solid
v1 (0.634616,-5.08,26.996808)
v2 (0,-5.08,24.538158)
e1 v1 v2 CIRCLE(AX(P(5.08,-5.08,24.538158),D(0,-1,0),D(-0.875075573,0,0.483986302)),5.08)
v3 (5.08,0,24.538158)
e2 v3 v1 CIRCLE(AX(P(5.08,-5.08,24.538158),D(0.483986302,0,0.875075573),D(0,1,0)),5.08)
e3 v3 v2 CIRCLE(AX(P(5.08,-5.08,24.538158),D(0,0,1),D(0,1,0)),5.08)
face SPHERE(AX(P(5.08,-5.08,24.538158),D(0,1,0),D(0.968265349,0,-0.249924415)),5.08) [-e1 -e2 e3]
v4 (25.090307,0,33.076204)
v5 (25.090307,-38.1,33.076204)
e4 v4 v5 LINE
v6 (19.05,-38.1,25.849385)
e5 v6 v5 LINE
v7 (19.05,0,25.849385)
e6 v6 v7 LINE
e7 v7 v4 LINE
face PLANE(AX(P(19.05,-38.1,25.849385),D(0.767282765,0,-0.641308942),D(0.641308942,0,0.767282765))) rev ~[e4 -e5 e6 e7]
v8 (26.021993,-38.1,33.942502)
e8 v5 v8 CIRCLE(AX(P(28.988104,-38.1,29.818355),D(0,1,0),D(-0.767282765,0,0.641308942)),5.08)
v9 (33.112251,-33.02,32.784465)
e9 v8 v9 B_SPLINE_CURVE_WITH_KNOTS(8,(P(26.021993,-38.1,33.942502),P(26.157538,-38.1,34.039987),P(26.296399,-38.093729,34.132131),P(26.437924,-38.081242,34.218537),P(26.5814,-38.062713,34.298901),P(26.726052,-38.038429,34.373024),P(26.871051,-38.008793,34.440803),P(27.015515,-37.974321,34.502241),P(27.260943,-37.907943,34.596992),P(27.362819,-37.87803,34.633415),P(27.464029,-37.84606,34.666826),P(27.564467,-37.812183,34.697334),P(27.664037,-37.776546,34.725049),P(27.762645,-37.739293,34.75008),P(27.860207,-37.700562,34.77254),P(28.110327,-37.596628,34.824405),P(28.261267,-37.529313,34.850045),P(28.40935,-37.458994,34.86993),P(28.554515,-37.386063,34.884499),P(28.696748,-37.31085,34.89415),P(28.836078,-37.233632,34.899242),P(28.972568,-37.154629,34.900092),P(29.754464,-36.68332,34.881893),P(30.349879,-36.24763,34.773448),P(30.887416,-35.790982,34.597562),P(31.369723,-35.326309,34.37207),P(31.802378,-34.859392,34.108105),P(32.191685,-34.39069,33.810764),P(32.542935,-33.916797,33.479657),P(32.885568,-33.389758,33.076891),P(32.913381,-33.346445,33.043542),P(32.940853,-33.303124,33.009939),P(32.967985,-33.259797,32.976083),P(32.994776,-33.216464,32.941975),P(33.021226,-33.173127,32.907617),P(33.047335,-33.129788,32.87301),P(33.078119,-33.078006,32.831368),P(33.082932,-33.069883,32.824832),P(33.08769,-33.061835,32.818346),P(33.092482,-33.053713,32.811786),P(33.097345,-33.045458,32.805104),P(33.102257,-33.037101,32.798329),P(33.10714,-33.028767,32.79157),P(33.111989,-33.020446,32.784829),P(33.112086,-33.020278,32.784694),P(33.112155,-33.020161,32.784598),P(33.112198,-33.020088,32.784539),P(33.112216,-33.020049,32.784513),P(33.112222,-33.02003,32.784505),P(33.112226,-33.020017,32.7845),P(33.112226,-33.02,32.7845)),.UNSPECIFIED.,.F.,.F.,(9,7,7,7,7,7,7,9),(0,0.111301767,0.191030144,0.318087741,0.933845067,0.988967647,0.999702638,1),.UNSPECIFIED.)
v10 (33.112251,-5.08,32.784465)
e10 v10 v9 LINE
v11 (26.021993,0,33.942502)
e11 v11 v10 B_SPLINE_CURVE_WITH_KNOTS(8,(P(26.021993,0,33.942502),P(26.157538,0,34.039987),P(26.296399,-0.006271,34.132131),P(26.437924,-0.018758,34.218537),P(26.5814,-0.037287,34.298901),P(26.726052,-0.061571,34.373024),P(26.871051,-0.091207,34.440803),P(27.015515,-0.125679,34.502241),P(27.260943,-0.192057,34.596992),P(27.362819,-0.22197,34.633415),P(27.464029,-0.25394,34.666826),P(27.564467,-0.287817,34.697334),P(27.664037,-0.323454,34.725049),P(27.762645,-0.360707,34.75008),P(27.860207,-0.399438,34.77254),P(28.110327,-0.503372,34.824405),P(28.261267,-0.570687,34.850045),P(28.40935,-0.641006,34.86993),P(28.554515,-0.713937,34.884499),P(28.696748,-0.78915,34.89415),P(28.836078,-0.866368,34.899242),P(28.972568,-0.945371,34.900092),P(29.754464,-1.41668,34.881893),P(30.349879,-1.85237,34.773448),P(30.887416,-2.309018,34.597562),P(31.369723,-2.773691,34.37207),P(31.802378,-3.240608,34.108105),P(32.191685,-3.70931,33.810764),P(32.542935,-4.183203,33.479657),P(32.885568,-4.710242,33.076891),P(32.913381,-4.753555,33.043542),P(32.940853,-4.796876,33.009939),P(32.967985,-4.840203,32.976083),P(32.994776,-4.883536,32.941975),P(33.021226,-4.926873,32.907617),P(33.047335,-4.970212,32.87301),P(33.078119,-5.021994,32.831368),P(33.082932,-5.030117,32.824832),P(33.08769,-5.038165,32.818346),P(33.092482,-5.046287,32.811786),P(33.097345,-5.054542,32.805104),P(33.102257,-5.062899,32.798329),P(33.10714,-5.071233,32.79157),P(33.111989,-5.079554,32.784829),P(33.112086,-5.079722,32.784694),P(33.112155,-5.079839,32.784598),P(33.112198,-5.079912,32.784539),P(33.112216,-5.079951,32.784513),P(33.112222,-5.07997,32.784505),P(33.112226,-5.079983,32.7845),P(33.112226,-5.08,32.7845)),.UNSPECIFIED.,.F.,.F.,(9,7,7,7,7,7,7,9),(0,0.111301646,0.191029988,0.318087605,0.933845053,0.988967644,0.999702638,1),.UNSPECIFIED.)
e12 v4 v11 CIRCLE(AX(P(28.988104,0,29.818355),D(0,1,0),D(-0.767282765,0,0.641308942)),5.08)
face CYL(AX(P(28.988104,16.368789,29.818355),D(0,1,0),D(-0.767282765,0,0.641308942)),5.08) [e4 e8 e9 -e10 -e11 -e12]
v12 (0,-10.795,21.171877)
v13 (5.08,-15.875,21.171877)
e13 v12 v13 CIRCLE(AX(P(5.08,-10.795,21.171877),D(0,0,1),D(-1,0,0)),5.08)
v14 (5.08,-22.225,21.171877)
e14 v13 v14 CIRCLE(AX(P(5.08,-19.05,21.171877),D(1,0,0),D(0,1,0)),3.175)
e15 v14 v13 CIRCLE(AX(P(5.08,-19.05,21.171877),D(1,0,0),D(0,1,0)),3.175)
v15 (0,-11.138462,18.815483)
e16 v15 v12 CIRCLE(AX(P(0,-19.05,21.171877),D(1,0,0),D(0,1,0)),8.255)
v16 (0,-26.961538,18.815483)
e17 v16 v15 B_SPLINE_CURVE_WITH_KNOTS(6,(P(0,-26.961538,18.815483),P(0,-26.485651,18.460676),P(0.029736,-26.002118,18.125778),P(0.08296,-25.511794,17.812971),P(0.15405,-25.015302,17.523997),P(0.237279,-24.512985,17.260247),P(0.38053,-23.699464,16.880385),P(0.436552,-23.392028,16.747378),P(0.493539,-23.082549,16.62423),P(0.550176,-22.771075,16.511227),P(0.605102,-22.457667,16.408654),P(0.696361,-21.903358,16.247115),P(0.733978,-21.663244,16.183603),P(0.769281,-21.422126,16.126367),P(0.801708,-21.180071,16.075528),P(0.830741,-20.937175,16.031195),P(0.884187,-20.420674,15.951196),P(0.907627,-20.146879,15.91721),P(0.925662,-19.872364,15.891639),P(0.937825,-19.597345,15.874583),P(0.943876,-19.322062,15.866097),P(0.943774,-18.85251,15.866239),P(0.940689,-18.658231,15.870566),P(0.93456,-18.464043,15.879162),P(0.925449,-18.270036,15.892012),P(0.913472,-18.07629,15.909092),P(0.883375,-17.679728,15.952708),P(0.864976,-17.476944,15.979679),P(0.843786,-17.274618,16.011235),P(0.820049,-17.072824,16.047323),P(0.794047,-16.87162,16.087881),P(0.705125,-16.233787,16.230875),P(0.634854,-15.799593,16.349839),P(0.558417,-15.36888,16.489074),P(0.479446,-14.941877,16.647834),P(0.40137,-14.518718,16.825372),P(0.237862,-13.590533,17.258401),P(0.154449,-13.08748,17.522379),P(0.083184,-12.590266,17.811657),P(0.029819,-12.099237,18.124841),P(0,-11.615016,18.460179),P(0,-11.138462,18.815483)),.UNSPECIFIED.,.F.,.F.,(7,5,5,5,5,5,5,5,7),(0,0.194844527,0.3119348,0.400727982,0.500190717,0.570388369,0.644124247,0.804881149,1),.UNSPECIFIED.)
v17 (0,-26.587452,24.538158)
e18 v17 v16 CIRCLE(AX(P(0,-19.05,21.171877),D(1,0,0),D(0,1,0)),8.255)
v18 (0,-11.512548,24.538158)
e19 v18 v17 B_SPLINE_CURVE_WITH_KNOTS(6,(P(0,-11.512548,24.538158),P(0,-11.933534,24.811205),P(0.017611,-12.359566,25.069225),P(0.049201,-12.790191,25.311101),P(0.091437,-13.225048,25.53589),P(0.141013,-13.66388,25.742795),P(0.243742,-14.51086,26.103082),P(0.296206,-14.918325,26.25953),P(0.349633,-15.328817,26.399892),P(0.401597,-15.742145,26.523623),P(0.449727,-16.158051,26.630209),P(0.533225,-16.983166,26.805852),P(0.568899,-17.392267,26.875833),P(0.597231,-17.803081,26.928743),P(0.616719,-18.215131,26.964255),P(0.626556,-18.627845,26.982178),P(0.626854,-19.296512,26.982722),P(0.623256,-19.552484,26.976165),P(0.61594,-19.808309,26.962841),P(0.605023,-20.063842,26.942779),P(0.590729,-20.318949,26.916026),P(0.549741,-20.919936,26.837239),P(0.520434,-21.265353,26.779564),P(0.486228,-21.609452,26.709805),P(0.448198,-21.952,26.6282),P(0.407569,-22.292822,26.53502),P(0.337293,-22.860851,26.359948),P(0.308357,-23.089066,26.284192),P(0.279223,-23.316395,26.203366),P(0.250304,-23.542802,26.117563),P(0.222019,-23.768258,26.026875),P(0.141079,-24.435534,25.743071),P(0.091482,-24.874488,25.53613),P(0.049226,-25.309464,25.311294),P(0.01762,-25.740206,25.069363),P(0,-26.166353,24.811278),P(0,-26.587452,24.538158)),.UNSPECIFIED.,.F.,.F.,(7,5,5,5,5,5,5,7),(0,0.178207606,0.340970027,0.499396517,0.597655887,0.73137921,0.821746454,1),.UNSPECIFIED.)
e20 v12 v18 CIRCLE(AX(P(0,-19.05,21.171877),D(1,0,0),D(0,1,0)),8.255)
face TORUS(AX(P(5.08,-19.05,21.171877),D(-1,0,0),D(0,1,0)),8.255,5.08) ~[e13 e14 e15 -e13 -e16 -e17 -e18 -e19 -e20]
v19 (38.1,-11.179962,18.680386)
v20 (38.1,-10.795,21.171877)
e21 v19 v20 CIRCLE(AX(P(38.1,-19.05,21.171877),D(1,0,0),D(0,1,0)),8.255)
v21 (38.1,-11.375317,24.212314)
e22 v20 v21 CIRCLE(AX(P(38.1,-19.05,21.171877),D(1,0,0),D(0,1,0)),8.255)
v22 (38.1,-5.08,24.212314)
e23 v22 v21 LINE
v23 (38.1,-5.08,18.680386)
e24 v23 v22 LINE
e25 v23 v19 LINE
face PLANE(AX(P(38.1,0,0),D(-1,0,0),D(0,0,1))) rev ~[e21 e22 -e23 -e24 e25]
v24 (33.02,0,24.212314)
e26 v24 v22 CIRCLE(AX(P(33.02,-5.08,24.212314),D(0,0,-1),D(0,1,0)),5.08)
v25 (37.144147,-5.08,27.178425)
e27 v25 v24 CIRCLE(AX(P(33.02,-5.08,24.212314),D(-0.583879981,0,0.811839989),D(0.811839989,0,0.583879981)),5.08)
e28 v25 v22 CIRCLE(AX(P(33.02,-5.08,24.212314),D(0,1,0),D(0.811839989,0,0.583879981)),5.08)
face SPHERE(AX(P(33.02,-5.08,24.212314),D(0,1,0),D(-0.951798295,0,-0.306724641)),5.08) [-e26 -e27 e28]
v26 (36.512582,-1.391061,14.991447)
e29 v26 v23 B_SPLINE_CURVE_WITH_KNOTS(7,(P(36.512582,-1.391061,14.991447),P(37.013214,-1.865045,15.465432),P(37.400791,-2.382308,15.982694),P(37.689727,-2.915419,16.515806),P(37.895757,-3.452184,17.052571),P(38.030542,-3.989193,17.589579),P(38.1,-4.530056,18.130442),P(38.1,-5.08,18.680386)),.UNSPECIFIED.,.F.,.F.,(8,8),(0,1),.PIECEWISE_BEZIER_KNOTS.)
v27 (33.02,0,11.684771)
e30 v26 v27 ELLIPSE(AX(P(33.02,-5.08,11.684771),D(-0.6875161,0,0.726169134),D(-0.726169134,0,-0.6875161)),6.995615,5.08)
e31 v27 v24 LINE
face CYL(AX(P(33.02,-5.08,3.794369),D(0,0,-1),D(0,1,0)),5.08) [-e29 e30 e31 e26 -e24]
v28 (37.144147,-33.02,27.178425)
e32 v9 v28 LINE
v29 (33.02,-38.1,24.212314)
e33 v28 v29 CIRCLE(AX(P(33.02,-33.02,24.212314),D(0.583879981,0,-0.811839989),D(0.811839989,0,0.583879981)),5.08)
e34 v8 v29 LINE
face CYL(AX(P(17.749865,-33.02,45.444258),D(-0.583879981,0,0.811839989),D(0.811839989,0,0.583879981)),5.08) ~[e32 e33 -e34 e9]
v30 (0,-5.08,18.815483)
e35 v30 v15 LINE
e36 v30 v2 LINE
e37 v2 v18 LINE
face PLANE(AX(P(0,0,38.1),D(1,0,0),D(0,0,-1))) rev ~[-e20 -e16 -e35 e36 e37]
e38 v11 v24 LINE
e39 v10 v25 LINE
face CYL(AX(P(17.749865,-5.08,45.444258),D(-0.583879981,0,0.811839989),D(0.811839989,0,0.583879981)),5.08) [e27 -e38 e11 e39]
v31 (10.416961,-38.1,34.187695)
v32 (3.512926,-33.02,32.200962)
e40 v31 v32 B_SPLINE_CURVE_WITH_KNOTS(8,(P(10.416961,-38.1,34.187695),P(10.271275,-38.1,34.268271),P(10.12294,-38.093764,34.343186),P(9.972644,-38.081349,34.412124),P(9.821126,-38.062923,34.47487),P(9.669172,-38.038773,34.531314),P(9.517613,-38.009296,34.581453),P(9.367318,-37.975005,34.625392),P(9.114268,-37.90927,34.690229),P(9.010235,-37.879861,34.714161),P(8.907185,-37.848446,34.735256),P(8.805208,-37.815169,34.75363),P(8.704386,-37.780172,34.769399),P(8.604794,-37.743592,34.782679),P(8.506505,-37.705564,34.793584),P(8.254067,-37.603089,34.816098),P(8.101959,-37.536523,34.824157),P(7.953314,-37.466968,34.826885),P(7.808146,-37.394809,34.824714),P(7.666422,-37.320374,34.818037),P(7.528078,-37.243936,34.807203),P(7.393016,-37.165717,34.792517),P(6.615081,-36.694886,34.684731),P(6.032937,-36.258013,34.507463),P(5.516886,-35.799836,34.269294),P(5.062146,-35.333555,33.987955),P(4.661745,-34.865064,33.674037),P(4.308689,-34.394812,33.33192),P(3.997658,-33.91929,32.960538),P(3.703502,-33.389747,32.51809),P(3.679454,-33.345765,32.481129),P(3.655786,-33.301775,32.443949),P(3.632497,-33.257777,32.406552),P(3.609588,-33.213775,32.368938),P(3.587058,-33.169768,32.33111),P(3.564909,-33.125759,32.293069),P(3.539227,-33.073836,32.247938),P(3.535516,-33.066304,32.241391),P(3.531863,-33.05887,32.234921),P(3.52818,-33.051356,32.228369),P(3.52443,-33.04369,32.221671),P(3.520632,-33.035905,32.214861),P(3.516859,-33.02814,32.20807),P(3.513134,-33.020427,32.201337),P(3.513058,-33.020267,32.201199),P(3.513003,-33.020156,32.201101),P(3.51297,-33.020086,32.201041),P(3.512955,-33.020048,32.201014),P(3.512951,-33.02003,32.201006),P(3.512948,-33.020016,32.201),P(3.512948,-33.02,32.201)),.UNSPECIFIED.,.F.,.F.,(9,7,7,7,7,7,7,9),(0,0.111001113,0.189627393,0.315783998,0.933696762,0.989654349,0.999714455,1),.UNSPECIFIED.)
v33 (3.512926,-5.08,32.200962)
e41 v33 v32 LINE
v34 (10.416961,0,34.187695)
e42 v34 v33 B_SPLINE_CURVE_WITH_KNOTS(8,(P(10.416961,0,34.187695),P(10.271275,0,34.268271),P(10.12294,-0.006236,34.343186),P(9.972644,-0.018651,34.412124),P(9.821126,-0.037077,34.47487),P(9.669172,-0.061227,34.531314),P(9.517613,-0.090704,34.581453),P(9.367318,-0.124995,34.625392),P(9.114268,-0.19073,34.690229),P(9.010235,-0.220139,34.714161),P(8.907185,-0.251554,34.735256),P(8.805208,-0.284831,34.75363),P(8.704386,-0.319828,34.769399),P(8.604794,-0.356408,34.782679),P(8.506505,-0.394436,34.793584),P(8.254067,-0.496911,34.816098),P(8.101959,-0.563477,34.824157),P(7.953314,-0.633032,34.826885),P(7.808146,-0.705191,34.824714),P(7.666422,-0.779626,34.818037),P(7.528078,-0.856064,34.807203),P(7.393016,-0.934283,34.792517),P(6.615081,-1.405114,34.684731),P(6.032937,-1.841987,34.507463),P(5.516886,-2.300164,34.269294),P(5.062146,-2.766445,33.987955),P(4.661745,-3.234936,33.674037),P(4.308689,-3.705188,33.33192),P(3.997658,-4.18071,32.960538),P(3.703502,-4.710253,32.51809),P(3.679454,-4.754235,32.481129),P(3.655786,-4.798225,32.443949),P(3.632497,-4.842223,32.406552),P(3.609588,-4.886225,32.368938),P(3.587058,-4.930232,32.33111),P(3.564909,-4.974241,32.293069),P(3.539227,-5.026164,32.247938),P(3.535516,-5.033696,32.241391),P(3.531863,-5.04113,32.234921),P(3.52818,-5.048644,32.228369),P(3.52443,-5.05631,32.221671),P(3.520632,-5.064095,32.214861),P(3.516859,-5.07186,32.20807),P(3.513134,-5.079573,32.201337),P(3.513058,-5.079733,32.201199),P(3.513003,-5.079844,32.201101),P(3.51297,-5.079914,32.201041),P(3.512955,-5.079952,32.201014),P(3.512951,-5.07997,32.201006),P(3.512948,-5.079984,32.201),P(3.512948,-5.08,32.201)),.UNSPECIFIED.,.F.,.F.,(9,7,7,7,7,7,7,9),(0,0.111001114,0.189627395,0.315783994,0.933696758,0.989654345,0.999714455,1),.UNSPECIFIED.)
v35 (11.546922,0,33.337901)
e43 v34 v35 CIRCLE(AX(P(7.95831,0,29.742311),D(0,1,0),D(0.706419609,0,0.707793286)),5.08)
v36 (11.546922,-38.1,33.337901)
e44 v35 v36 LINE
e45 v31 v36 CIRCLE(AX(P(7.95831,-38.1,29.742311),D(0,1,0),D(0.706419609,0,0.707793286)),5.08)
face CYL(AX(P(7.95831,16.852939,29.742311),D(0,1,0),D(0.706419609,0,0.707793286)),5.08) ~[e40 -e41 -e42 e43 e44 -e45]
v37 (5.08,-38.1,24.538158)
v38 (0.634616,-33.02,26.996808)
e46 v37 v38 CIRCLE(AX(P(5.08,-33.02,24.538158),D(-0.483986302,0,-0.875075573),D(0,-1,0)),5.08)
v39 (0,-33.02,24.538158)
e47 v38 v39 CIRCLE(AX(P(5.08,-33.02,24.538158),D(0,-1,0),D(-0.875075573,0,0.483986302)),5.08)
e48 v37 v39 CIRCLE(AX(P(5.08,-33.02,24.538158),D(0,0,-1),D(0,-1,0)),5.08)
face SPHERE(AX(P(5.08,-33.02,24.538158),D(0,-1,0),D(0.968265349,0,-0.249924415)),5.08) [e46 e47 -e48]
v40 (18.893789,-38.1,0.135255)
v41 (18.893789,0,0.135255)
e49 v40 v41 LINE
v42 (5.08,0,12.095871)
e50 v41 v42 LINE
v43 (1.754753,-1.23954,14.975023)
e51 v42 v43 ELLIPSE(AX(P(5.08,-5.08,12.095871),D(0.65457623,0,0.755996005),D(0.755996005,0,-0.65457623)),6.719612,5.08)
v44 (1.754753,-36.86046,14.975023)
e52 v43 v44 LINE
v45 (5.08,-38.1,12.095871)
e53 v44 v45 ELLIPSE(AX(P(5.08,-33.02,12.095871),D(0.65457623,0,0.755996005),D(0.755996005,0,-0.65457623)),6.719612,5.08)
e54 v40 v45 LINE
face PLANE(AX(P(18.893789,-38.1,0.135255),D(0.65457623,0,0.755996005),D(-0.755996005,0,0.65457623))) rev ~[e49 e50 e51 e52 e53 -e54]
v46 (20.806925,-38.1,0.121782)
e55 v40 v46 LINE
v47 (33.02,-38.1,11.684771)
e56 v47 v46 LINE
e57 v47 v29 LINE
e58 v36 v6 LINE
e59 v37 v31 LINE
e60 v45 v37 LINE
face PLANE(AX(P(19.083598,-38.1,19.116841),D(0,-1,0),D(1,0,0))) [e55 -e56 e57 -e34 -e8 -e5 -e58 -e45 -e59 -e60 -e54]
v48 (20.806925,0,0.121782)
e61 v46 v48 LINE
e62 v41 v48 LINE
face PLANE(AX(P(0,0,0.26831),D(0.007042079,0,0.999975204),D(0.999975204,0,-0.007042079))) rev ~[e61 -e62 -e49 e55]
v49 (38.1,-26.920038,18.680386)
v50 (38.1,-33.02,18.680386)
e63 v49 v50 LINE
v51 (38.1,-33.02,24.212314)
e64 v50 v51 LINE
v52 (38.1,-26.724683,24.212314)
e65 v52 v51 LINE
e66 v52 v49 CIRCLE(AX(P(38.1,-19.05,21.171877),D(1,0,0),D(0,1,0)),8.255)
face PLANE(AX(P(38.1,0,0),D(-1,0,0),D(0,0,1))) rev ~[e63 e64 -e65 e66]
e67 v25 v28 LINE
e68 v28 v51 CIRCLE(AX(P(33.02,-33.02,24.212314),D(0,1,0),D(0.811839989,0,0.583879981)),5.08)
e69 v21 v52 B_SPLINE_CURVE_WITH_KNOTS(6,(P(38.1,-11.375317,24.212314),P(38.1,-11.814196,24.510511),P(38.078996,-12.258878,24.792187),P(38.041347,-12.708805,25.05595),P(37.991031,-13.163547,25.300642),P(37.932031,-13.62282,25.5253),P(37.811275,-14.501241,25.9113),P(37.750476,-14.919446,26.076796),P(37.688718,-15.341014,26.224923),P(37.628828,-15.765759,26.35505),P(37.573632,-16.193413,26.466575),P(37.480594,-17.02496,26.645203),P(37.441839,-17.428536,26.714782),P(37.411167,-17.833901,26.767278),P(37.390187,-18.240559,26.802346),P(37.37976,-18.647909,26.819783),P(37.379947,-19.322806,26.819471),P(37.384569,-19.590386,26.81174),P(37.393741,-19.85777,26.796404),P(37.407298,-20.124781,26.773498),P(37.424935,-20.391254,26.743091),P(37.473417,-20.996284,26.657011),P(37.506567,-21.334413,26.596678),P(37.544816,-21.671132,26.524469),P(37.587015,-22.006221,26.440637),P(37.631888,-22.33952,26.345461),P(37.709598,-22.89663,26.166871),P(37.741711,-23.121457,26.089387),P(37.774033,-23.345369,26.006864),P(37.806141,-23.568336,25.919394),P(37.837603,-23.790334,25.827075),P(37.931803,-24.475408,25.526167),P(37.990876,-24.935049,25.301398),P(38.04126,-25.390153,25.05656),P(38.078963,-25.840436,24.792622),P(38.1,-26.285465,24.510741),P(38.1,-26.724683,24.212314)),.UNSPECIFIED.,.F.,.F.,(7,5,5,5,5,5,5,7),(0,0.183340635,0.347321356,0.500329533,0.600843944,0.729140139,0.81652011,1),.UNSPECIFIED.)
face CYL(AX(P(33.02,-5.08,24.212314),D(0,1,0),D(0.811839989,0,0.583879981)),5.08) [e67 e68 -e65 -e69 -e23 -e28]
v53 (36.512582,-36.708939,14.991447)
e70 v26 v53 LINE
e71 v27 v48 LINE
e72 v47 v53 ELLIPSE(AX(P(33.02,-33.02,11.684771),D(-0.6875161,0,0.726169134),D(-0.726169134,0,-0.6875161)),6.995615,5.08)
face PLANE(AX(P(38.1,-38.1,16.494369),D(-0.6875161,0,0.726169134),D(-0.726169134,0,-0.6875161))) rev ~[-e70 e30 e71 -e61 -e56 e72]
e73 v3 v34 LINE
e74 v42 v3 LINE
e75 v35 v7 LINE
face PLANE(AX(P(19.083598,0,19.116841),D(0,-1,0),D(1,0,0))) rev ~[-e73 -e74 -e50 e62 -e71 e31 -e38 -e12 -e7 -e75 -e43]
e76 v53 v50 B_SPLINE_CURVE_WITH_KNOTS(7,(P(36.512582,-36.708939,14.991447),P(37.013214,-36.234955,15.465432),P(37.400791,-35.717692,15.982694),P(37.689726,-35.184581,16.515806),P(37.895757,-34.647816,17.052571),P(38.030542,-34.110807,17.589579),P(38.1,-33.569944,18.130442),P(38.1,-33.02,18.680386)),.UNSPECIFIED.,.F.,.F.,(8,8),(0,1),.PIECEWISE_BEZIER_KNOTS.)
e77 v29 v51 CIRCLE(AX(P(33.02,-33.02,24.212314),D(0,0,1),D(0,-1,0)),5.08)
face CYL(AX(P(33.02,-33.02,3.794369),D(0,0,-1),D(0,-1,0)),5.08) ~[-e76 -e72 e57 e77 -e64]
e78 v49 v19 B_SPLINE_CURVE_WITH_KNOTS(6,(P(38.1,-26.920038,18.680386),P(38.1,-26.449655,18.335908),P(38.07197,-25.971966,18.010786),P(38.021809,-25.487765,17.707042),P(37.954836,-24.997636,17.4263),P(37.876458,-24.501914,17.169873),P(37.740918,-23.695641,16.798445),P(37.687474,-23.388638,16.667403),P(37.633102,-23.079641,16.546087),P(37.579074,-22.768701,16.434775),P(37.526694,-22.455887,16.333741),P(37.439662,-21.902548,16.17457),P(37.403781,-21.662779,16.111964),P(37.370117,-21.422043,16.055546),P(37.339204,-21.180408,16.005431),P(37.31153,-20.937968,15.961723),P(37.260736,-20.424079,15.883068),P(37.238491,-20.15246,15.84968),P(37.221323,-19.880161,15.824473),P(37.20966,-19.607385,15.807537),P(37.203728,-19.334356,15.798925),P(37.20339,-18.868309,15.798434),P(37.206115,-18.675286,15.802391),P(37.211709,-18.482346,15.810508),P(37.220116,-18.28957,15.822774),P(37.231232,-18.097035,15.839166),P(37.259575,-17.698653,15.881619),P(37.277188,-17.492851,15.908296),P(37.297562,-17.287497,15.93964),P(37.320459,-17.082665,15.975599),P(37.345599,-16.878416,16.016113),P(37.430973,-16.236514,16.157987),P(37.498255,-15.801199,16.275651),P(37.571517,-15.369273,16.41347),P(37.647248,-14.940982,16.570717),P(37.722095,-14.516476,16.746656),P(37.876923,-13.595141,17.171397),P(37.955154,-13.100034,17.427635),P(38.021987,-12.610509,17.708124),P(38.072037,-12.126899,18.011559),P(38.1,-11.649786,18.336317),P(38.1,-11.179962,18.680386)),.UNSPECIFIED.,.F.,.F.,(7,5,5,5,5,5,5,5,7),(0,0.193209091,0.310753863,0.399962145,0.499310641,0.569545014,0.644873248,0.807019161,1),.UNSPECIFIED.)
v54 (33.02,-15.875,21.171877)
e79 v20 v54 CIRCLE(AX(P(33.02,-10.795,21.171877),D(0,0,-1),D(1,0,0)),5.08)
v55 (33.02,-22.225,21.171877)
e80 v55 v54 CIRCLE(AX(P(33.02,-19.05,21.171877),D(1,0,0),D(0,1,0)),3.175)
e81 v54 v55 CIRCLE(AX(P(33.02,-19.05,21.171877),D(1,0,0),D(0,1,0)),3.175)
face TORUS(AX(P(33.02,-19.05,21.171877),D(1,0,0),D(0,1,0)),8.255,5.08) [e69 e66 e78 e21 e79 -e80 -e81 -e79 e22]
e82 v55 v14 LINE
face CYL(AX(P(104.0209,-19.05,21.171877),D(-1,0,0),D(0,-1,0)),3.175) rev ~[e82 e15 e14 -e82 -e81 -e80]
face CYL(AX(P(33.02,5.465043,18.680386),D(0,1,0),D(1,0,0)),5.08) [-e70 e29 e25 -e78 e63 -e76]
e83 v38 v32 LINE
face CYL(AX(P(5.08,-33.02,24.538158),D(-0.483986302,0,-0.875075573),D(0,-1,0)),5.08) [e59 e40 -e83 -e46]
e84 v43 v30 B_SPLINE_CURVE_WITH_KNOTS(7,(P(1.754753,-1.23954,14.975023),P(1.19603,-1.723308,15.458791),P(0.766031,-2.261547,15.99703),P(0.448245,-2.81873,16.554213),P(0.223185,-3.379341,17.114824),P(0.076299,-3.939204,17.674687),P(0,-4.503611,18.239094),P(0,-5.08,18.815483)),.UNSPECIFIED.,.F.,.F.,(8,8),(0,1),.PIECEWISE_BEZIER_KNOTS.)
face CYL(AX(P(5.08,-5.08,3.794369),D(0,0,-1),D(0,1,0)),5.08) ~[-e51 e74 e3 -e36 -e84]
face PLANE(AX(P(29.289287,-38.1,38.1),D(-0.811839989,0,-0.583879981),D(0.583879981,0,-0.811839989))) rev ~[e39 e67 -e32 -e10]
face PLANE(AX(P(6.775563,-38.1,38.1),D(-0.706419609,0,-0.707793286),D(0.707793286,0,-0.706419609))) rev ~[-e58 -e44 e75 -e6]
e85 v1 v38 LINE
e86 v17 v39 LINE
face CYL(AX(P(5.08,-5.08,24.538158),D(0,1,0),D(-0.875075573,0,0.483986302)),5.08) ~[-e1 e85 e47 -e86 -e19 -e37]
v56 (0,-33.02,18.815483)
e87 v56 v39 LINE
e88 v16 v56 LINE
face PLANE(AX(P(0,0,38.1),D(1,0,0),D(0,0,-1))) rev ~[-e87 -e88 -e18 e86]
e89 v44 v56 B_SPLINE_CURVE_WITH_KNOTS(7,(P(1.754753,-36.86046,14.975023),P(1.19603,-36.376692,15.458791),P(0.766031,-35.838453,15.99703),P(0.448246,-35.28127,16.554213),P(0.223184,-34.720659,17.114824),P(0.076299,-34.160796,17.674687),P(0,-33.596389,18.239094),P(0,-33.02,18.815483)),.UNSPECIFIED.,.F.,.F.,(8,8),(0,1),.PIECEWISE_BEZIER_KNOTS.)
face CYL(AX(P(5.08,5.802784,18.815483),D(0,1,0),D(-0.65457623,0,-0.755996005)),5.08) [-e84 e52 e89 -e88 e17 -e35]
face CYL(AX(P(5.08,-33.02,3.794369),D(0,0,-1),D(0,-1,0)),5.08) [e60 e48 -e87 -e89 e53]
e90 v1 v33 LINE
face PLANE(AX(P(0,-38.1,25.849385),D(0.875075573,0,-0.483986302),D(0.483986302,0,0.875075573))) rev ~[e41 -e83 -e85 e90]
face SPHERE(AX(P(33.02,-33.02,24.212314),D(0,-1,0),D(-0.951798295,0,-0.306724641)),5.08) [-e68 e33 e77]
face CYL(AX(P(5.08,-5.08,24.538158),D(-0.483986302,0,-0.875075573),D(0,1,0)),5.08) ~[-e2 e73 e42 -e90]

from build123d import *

# Parameters (mm, degrees)
F1_DEPTH     = 38.1
F3_DEPTH     = 38.1
F5_D         = 6.35
F6_T1_DEPTH  = 20.7437886812
F6_T3_DEPTH  = 27.94
F6_T5_DEPTH  = 49.7055689591
F6_T7_DEPTH  = 20.4179452734
F6_T9_DEPTH  = 49.0300859467
F6_T11_DEPTH = 71.8058781858
F6_T13_DEPTH = 25.3882661408
F6_T15_DEPTH = 70.8375780274
F6_T17_DEPTH = 26.1528668654
F6_T22_DEPTH = 5.08
F6_T28_DEPTH = 5.08
F6_T34_DEPTH = 5.08
F6_T40_DEPTH = 5.08


# Not quite as in the source:
# - a fillet or chamfer that OpenCascade refuses, or shapes differently, is made with other operations: its cross-section is extruded or revolved along the edge and cut away or added


with BuildPart() as f1:
    # F0 (on Front) → F1 (new body)
    with BuildSketch(Plane.XZ):
        Polygon((0, 38.1), (0, 0.2683098665), (38.1, 0), (38.1, 38.1), align=None)
    extrude(amount=F1_DEPTH)

    # F2 (on face) → F3 (cut)
    with BuildSketch(Plane.XZ.offset(38.1)):
        Polygon((29.289287496, 38.1), (6.7755630988, 38.1), (19.05, 25.849385187), align=None)
        Polygon((0, 38.1), (0, 25.849385187), (6.7755630988, 38.1), align=None)
        Polygon((29.289287496, 38.1), (38.1, 25.849385187), (38.1, 38.1), align=None)
        Polygon((0, 0.2683098665), (18.8937886297, 0.1352550134), (0, 16.4943691343), align=None)
        Polygon((38.1, 16.4943691343), (20.8069253196, 0.1217822194), (38.1, 0), align=None)
    extrude(amount=-F3_DEPTH, mode=Mode.SUBTRACT)

    # F5 (through all)
    with Locations(Plane.YZ.offset(38.1)):
        with Locations((-19.05, 21.1718771607)):
            Hole(F5_D / 2)

    # F6: fillet of radius 5.08 on 16 edges, made by hand

    # F6_s2 → F6_t1 (cut)
    with BuildSketch(Plane.XY.offset(3.7943691343)):
        with BuildLine():
            ThreePointArc((5.08, 0), (1.4878975516, -1.4878975516), (0, -5.08))
            Line((0, -5.08), (0, 0))
            Line((0, 0), (5.08, 0))
        make_face()
        with BuildLine():
            ThreePointArc((5.08, -38.1), (1.4878975516, -36.6121024484), (0, -33.02))
            Line((0, -33.02), (0, -38.1))
            Line((0, -38.1), (5.08, -38.1))
        make_face()
    extrude(amount=F6_T1_DEPTH, mode=Mode.SUBTRACT)

    # F6_s4 → F6_t3 (cut)
    with BuildSketch(Plane.XZ.offset(5.08)):
        with BuildLine():
            ThreePointArc((0.634616087, 26.9968082311), (0.1612120254, 25.8077738444), (0, 24.5381578155))
            Line((0, 24.5381578155), (0, 25.849385187))
            Line((0, 25.849385187), (0.634616087, 26.9968082311))
        make_face()
        with BuildLine():
            ThreePointArc((37.1441471446, 27.1784247107), (37.8551353391, 25.7704755844), (38.1, 24.2123144077))
            Line((38.1, 24.2123144077), (38.1, 25.849385187))
            Line((38.1, 25.849385187), (37.1441471446, 27.1784247107))
        make_face()
    extrude(amount=F6_T3_DEPTH, mode=Mode.SUBTRACT)

    # F6_s6 → F6_t5 (cut)
    with BuildSketch(Plane.XZ.offset(-5.8027844796)):
        with BuildLine():
            ThreePointArc((1.754752754, 14.9750232202), (0.4594666969, 16.704305057), (0, 18.8154829261))
            Line((0, 18.8154829261), (0, 16.4943691343))
            Line((0, 16.4943691343), (1.754752754, 14.9750232202))
        make_face()
    extrude(amount=F6_T5_DEPTH, mode=Mode.SUBTRACT)

    # F6_s8 → F6_t7 (cut)
    with BuildSketch(Plane.XY.offset(3.7943691343)):
        with BuildLine():
            ThreePointArc((33.02, 0), (36.6121024484, -1.4878975516), (38.1, -5.08))
            Line((38.1, -5.08), (38.1, 0))
            Line((38.1, 0), (33.02, 0))
        make_face()
        with BuildLine():
            ThreePointArc((33.02, -38.1), (36.6121024484, -36.6121024484), (38.1, -33.02))
            Line((38.1, -33.02), (38.1, -38.1))
            Line((38.1, -38.1), (33.02, -38.1))
        make_face()
    extrude(amount=F6_T7_DEPTH, mode=Mode.SUBTRACT)

    # F6_s10 → F6_t9 (cut)
    with BuildSketch(Plane.XZ.offset(-5.4650429733)):
        with BuildLine():
            ThreePointArc((38.1, 18.6803863236), (37.6863002203, 16.6723917386), (36.5125817899, 14.991447121))
            Line((36.5125817899, 14.991447121), (38.1, 16.4943691343))
            Line((38.1, 16.4943691343), (38.1, 18.6803863236))
        make_face()
    extrude(amount=F6_T9_DEPTH, mode=Mode.SUBTRACT)

    # F6_s12 → F6_t11 (cut)
    with BuildSketch(Plane.XZ.offset(-16.8529390929)):
        with BuildLine():
            ThreePointArc((11.5469219559, 33.3379013421), (7.2465010014, 34.7721948924), (3.5129264291, 32.2009618637))
            Line((3.5129264291, 32.2009618637), (6.7755630988, 38.1))
            Line((6.7755630988, 38.1), (11.5469219559, 33.3379013421))
        make_face()
    extrude(amount=F6_T11_DEPTH, mode=Mode.SUBTRACT)

    # F6_s14 → F6_t13 (cut)
    with BuildSketch(Plane(origin=(11.5824663758, 0, 20.9417773971), x_dir=(0, 1, 0), z_dir=(0.4839863023, 0, 0.8750755734))):
        with BuildLine():
            ThreePointArc((-38.1, 7.4307483528), (-36.6121024484, 11.0228508012), (-33.02, 12.5107483528))
            Line((-33.02, 12.5107483528), (-38.1, 12.5107483528))
            Line((-38.1, 12.5107483528), (-38.1, 7.4307483528))
        make_face()
        with BuildLine():
            ThreePointArc((0, 7.4307483528), (-1.4878975516, 11.0228508012), (-5.08, 12.5107483528))
            Line((-5.08, 12.5107483528), (0, 12.5107483528))
            Line((0, 12.5107483528), (0, 7.4307483528))
        make_face()
    extrude(amount=F6_T13_DEPTH, mode=Mode.SUBTRACT)

    # F6_s16 → F6_t15 (cut)
    with BuildSketch(Plane.XZ.offset(-16.3687890137)):
        with BuildLine():
            ThreePointArc((25.0903071925, 33.076204123), (29.1727291737, 34.8949986115), (33.1122507828, 32.7844650022))
            Line((33.1122507828, 32.7844650022), (29.289287496, 38.1))
            Line((29.289287496, 38.1), (25.0903071925, 33.076204123))
        make_face()
    extrude(amount=F6_T15_DEPTH, mode=Mode.SUBTRACT)

    # F6_s18 → F6_t17 (cut)
    with BuildSketch(Plane(origin=(-15.4901461094, 0, 21.5378510306), x_dir=(0, 1, 0), z_dir=(0.5838799809, 0, -0.8118399891))):
        with BuildLine():
            ThreePointArc((-33.02, 46.024042114), (-36.6121024484, 44.5361445625), (-38.1, 40.944042114))
            Line((-38.1, 40.944042114), (-38.1, 46.024042114))
            Line((-38.1, 46.024042114), (-33.02, 46.024042114))
        make_face()
        with BuildLine():
            ThreePointArc((-5.08, 46.024042114), (-1.4878975516, 44.5361445625), (0, 40.944042114))
            Line((0, 40.944042114), (0, 46.024042114))
            Line((0, 46.024042114), (-5.08, 46.024042114))
        make_face()
    extrude(amount=F6_T17_DEPTH, mode=Mode.SUBTRACT)


with BuildPart() as f6_tool20:
    # F6_s21 → F6_t22 (new body)
    with BuildSketch(Plane.XZ.offset(5.08)):
        Polygon((5.08, 24.5381578155), (0.634616087, 26.9968082311), (0, 25.849385187), (0, 24.5381578155), align=None)
    extrude(amount=-F6_T22_DEPTH)

    # F6_s23 → F6_t24 (revolve, cut)
    with BuildSketch(Plane(origin=(5.08, -5.08, 24.5381578155), x_dir=(0.9682653493, 0, -0.2499244151), z_dir=(0.2499244151, 0, 0.9682653493))):
        with BuildLine():
            ThreePointArc((0, -5.08), (5.08, 0), (0, 5.08))
            Line((0, 5.08), (0, -5.08))
        make_face()
    revolve(axis=Axis((5.08, -5.08, 24.5381578155), (0, 1, 0)), mode=Mode.SUBTRACT)


with BuildPart() as f1_1:
    add(f1.part)

    # F6_t19: cut F6_tool20
    add(f6_tool20.part, mode=Mode.SUBTRACT)


with BuildPart() as f6_tool26:
    # F6_s27 → F6_t28 (new body)
    with BuildSketch(Plane.XZ.offset(33.02)):
        Polygon((5.08, 24.5381578155), (0.634616087, 26.9968082311), (0, 25.849385187), (0, 24.5381578155), align=None)
    extrude(amount=F6_T28_DEPTH)

    # F6_s29 → F6_t30 (revolve, cut)
    with BuildSketch(Plane(origin=(5.08, -33.02, 24.5381578155), x_dir=(0.9682653493, 0, -0.2499244151), z_dir=(-0.2499244151, 0, -0.9682653493))):
        with BuildLine():
            ThreePointArc((0, -5.08), (5.08, 0), (0, 5.08))
            Line((0, 5.08), (0, -5.08))
        make_face()
    revolve(axis=Axis((5.08, -33.02, 24.5381578155), (0, -1, 0)), mode=Mode.SUBTRACT)


with BuildPart() as f1_2:
    add(f1_1.part)

    # F6_t25: cut F6_tool26
    add(f6_tool26.part, mode=Mode.SUBTRACT)


with BuildPart() as f6_tool32:
    # F6_s33 → F6_t34 (new body)
    with BuildSketch(Plane.XZ.offset(5.08)):
        Polygon((33.02, 24.2123144077), (38.1, 24.2123144077), (38.1, 25.849385187), (37.1441471446, 27.1784247107), align=None)
    extrude(amount=-F6_T34_DEPTH)

    # F6_s35 → F6_t36 (revolve, cut)
    with BuildSketch(Plane(origin=(33.02, -5.08, 24.2123144077), x_dir=(-0.9517982951, 0, -0.3067246411), z_dir=(0.3067246411, 0, -0.9517982951))):
        with BuildLine():
            ThreePointArc((0, -5.08), (5.08, 0), (0, 5.08))
            Line((0, 5.08), (0, -5.08))
        make_face()
    revolve(axis=Axis((33.02, -5.08, 24.2123144077), (0, 1, 0)), mode=Mode.SUBTRACT)


with BuildPart() as f1_3:
    add(f1_2.part)

    # F6_t31: cut F6_tool32
    add(f6_tool32.part, mode=Mode.SUBTRACT)


with BuildPart() as f6_tool38:
    # F6_s39 → F6_t40 (new body)
    with BuildSketch(Plane.XZ.offset(33.02)):
        Polygon((33.02, 24.2123144077), (38.1, 24.2123144077), (38.1, 25.849385187), (37.1441471446, 27.1784247107), align=None)
    extrude(amount=F6_T40_DEPTH)

    # F6_s41 → F6_t42 (revolve, cut)
    with BuildSketch(Plane(origin=(33.02, -33.02, 24.2123144077), x_dir=(-0.9517982951, 0, -0.3067246411), z_dir=(-0.3067246411, 0, 0.9517982951))):
        with BuildLine():
            ThreePointArc((0, -5.08), (5.08, 0), (0, 5.08))
            Line((0, 5.08), (0, -5.08))
        make_face()
    revolve(axis=Axis((33.02, -33.02, 24.2123144077), (0, -1, 0)), mode=Mode.SUBTRACT)


with BuildPart() as f1_4:
    add(f1_3.part)

    # F6_t37: cut F6_tool38
    add(f6_tool38.part, mode=Mode.SUBTRACT)

    # F6_s43 → F6_t44 (revolve, cut)
    with BuildSketch(Plane.XY.offset(21.1718771607)):
        with BuildLine():
            ThreePointArc((0, -10.795), (1.4878975516, -14.3871024484), (5.08, -15.875))
            Line((5.08, -15.875), (0, -15.875))
            Line((0, -15.875), (0, -10.795))
        make_face()
    revolve(axis=Axis((0, -19.05, 21.1718771607), (1, 0, 0)), mode=Mode.SUBTRACT)

    # F6_s45 → F6_t46 (revolve, cut)
    with BuildSketch(Plane.XY.offset(21.1718771607)):
        with BuildLine():
            ThreePointArc((38.1, -10.795), (36.6121024484, -14.3871024484), (33.02, -15.875))
            Line((33.02, -15.875), (38.1, -15.875))
            Line((38.1, -15.875), (38.1, -10.795))
        make_face()
    revolve(axis=Axis((38.1, -19.05, 21.1718771607), (1, 0, 0)), mode=Mode.SUBTRACT)


solid = f1_4.part
